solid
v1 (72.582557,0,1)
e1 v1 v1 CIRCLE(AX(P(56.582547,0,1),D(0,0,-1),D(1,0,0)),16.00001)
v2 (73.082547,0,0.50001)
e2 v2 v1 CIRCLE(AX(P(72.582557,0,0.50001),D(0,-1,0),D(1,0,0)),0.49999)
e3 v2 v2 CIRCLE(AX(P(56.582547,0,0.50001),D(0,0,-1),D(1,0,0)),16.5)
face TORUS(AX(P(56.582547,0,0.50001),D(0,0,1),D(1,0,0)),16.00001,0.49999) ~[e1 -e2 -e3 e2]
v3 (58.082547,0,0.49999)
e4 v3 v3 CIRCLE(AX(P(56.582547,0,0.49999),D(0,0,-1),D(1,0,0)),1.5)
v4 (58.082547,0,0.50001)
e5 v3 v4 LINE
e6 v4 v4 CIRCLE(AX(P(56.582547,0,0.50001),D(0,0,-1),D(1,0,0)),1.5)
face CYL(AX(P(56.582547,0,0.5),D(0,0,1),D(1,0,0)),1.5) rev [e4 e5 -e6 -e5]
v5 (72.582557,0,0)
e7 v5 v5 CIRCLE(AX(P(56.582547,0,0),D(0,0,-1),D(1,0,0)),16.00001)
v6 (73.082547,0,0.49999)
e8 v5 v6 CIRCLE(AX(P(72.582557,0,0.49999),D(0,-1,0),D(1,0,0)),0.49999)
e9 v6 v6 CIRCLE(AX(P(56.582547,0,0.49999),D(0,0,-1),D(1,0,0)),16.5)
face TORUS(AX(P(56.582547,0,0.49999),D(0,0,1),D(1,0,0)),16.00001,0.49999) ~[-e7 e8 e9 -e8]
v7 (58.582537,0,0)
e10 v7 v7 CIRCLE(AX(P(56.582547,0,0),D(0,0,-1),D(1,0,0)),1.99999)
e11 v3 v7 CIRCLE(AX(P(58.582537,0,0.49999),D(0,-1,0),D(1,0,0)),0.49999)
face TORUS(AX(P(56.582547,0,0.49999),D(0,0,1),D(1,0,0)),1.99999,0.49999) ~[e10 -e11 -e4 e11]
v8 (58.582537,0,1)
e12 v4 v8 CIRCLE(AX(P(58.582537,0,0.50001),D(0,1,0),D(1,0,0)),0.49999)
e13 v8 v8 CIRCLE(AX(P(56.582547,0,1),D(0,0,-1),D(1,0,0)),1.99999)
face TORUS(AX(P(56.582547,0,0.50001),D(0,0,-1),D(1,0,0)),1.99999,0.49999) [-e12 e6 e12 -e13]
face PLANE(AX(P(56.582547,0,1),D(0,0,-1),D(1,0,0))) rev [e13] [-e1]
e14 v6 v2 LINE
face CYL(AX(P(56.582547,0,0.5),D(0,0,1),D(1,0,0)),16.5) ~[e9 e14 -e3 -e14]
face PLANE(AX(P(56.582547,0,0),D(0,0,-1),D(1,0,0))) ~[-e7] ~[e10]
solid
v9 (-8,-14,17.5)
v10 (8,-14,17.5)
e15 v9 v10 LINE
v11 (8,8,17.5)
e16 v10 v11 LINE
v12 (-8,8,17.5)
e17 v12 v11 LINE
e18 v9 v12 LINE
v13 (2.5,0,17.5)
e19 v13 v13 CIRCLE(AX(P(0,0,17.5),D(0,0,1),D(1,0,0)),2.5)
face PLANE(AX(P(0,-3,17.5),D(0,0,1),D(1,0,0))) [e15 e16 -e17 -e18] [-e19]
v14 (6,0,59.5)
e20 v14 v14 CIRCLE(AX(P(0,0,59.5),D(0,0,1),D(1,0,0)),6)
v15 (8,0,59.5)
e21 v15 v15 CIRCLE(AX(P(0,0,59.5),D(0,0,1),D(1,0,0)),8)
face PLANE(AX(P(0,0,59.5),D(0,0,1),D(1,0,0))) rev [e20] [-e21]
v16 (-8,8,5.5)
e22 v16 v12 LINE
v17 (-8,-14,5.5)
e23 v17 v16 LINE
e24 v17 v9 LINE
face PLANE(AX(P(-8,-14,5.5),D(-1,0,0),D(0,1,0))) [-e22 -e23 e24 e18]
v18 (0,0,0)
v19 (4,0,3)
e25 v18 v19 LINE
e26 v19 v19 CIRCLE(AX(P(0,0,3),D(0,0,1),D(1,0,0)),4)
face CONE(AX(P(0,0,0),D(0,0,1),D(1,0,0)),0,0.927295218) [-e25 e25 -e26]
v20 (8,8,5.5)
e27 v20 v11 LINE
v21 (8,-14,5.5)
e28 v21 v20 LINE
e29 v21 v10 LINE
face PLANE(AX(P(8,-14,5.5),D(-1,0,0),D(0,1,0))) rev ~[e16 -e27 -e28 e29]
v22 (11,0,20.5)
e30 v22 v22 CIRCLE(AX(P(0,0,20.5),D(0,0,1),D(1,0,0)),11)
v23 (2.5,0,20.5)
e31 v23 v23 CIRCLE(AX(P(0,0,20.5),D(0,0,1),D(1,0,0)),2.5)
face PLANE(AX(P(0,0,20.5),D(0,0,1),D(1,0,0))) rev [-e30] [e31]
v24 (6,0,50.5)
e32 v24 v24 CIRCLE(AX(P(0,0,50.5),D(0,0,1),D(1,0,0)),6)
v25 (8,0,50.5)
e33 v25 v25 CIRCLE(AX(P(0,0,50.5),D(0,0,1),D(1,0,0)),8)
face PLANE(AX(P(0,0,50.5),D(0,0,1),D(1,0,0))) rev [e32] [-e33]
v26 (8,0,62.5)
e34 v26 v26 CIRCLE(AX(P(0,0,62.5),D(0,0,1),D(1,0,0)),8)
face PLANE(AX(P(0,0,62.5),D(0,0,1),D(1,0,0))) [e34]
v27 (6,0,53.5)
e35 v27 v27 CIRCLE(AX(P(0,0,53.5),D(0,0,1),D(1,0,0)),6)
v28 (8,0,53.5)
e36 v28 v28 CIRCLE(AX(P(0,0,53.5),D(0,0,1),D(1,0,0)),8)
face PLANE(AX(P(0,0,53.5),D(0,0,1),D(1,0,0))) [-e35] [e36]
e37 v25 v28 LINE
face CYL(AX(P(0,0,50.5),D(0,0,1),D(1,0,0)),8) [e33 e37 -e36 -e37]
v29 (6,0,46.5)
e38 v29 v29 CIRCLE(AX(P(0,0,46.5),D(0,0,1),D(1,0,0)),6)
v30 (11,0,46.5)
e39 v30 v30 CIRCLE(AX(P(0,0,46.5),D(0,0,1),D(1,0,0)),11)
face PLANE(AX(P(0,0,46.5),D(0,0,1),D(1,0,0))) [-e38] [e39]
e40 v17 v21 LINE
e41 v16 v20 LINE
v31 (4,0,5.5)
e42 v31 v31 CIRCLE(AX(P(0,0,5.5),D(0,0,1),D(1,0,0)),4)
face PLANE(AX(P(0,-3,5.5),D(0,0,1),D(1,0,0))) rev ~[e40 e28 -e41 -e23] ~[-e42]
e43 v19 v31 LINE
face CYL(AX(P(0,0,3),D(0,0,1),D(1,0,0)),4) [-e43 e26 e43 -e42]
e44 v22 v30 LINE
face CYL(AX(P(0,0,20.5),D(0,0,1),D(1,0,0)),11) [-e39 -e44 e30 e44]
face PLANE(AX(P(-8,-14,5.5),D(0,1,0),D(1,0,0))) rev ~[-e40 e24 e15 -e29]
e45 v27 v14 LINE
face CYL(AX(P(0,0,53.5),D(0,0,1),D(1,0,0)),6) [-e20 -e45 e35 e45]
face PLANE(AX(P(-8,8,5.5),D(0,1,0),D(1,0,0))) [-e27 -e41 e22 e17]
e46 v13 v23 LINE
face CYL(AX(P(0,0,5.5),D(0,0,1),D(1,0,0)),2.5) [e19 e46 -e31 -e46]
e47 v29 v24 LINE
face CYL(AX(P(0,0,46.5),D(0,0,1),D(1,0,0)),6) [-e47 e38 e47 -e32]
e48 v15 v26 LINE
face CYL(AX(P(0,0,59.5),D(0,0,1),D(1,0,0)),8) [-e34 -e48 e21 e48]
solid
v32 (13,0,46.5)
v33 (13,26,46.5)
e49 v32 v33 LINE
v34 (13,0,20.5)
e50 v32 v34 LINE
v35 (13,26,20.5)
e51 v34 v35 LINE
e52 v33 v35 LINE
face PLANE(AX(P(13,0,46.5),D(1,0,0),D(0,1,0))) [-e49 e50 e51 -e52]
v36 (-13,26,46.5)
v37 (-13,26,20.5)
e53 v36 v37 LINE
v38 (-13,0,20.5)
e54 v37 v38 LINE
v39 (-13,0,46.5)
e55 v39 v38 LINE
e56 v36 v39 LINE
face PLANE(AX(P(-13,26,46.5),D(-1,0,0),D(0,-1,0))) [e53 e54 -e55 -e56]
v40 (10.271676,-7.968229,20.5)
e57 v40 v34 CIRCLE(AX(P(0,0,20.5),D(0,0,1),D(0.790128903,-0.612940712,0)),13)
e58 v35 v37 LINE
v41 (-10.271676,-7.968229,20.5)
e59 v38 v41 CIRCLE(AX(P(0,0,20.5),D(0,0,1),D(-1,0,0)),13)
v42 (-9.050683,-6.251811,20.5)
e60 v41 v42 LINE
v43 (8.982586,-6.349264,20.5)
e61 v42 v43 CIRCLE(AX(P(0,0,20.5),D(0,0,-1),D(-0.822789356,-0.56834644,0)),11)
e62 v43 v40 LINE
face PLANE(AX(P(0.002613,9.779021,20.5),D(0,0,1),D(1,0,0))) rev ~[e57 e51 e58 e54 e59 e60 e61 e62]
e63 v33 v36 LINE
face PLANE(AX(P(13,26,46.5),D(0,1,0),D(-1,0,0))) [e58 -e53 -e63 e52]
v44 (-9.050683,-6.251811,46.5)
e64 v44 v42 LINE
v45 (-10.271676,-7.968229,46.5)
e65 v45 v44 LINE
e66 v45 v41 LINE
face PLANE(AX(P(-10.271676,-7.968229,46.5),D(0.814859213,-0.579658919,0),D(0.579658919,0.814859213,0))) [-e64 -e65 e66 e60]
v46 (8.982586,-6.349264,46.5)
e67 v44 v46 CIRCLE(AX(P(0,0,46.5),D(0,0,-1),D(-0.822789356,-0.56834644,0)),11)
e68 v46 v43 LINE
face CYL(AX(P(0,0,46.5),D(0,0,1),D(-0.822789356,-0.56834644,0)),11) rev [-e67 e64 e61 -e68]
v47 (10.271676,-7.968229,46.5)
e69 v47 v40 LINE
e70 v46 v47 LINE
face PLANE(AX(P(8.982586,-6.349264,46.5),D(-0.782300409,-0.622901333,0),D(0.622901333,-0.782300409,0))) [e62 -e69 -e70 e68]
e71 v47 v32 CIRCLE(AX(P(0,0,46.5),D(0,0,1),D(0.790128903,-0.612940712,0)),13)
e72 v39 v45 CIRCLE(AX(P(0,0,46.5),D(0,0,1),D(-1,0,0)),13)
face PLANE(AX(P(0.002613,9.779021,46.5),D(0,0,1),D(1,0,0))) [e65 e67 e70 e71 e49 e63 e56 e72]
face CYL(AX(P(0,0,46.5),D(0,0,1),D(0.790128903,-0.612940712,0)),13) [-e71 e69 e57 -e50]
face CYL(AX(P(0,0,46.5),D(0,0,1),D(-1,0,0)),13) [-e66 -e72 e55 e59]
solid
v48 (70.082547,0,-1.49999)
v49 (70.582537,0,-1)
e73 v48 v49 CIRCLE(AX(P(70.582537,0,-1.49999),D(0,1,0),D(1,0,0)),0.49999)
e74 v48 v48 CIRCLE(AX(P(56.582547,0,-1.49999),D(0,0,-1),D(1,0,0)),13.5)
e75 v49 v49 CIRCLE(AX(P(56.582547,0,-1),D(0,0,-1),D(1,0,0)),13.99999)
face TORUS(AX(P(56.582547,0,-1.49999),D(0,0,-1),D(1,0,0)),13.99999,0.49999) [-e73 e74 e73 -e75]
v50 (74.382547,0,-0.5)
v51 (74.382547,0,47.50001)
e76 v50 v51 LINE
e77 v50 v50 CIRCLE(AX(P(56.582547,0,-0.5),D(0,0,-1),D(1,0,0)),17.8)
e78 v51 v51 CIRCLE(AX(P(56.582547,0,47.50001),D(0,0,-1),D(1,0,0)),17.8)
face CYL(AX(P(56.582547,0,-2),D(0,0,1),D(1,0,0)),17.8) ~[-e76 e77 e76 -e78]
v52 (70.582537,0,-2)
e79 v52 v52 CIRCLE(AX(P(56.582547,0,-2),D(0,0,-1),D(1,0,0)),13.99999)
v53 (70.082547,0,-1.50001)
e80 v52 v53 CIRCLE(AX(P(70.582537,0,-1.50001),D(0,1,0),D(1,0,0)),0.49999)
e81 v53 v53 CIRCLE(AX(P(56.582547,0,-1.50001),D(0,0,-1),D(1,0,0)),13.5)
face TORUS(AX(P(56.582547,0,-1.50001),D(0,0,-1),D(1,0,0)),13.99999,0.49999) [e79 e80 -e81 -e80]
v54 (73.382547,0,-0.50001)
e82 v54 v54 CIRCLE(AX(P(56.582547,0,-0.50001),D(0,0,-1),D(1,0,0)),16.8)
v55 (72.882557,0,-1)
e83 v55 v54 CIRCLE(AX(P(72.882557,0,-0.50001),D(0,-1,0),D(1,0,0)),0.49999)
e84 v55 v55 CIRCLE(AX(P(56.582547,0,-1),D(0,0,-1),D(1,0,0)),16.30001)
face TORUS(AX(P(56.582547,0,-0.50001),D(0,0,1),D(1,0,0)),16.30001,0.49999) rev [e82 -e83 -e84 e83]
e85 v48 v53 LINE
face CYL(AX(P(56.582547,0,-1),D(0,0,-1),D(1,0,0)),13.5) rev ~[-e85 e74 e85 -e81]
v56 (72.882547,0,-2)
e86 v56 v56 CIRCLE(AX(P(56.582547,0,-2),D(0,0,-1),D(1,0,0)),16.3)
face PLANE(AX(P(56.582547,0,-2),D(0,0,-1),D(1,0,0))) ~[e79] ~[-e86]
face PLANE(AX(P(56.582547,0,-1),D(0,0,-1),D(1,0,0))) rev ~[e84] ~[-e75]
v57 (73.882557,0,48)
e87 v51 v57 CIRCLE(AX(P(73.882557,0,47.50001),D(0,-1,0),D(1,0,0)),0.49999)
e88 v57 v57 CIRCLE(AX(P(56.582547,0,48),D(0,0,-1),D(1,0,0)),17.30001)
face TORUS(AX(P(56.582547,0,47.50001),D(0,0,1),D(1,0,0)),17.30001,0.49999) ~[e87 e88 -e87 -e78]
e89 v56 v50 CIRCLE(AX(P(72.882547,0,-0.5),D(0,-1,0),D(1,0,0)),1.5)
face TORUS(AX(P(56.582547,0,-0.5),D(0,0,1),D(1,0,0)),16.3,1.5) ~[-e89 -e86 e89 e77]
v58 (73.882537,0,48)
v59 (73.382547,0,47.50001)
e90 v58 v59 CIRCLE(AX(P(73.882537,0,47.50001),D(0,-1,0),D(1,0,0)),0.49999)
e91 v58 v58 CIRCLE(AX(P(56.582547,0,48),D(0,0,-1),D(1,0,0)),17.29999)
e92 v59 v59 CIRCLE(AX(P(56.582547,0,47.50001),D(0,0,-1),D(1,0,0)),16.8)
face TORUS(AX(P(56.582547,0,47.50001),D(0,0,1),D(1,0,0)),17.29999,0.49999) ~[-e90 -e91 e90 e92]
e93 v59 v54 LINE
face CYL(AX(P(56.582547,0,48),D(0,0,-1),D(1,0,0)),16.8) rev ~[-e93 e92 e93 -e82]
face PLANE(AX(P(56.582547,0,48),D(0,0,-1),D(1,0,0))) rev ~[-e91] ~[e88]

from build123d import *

# Parameters (mm, degrees)
F2_W     = 16
F2_H     = 22
F2_R     = 4
F2_R_2   = 2.5
F3_DEPTH = 12
F5_DEPTH = 26
F6_W     = 15
F6_H     = 1
F8_R     = 1.5
F9_R     = 0.49999
F9_2_R   = 0.49999


# Not quite as in the source:
# - a fillet or chamfer is up to 0.001 mm smaller than in the source, because OpenCascade refuses the exact size


with BuildPart() as f1:
    # F0 (on Front) → F1 (revolve)
    with BuildSketch(Plane.XZ):
        Polygon((8, 62.5), (0, 62.5), (0, 0), (4, 3), (4, 5.5), (2.5, 5.5), (2.5, 20.5), (11, 20.5), (11, 46.5), (6, 46.5), (6, 50.5), (8, 50.5), (8, 53.5), (6, 53.5), (6, 59.5), (8, 59.5), align=None)
    revolve(axis=Axis((0, 0, 31.25), (0, 0, 1)))

    # F2 (on face) → F3 (join)
    with BuildSketch(Plane.XY.offset(5.5)):
        with Locations((0, -3)):
            Rectangle(F2_W, F2_H)
        Circle(F2_R, mode=Mode.SUBTRACT)
        Circle(F2_R)
        Circle(F2_R_2, mode=Mode.SUBTRACT)
        Circle(F2_R_2)
    extrude(amount=F3_DEPTH)


with BuildPart() as f5:
    # F4 (on face) → F5 (new body)
    with BuildSketch(Plane.XY.offset(46.5)):
        with BuildLine():
            Line((8.9825857509, -6.349263991), (10.2716757383, -7.9682292592))
            ThreePointArc((10.2716757383, -7.9682292592), (12.2990199731, -4.2111883953), (13, 0))
            Line((13, 0), (13, 26))
            Line((13, 26), (-13, 26))
            Line((-13, 26), (-13, 0))
            ThreePointArc((-13, 0), (-12.2990199731, -4.2111883953), (-10.2716757383, -7.9682292592))
            Line((-10.2716757383, -7.9682292592), (-9.0506829178, -6.2518108354))
            ThreePointArc((-9.0506829178, -6.2518108354), (-3.2743310694, 10.5013692463), (11, 0))
            ThreePointArc((11, 0), (10.4835214327, -3.3310326282), (8.9825857509, -6.349263991))
        make_face()
    extrude(amount=-F5_DEPTH)


with BuildPart() as f7:
    # F6 (on Front) → F7 (revolve)
    with BuildSketch(Plane.XZ):
        Polygon((73.3825470388, -1), (70.0825470388, -1), (70.0825470388, -2), (74.3825470388, -2), (74.3825470388, 48), (73.3825470388, 48), align=None)
    revolve(axis=Axis((56.5825470388, 0, 14.3292332895), (0, 0, -1)))

    # F8
    f8_edges = [f7.edges().sort_by_distance(p)[0] for p in [
        (38.782547, 0, -2),
    ]]
    fillet(f8_edges, radius=F8_R)

    # F9 (radius 0.5 in the source; OpenCascade refuses exactly that, so slightly less here)
    f9_edges = [f7.edges().sort_by_distance(p)[0] for p in [
        (39.782547, 0, -1),
        (43.082547, 0, -1),
        (43.082547, 0, -2),
        (38.782547, 0, 48),
        (39.782547, 0, 48),
    ]]
    fillet(f9_edges, radius=F9_R)


with BuildPart() as f7b:
    # F6 (on Front) → F7, piece 2 (revolve)
    with BuildSketch(Plane.XZ):
        with Locations((65.5825470388, 0.5)):
            Rectangle(F6_W, F6_H)
    revolve(axis=Axis((56.5825470388, 0, 14.3292332895), (0, 0, -1)))

    # F9#2 (radius 0.5 in the source; OpenCascade refuses exactly that, so slightly less here)
    f9_2_edges = [f7b.edges().sort_by_distance(p)[0] for p in [
        (40.082547, 0, 1),
        (55.082547, 0, 1),
        (40.082547, 0, 0),
        (55.082547, 0, 0),
    ]]
    fillet(f9_2_edges, radius=F9_2_R)


solid = Compound([f1.part, f5.part, f7.part, f7b.part])
